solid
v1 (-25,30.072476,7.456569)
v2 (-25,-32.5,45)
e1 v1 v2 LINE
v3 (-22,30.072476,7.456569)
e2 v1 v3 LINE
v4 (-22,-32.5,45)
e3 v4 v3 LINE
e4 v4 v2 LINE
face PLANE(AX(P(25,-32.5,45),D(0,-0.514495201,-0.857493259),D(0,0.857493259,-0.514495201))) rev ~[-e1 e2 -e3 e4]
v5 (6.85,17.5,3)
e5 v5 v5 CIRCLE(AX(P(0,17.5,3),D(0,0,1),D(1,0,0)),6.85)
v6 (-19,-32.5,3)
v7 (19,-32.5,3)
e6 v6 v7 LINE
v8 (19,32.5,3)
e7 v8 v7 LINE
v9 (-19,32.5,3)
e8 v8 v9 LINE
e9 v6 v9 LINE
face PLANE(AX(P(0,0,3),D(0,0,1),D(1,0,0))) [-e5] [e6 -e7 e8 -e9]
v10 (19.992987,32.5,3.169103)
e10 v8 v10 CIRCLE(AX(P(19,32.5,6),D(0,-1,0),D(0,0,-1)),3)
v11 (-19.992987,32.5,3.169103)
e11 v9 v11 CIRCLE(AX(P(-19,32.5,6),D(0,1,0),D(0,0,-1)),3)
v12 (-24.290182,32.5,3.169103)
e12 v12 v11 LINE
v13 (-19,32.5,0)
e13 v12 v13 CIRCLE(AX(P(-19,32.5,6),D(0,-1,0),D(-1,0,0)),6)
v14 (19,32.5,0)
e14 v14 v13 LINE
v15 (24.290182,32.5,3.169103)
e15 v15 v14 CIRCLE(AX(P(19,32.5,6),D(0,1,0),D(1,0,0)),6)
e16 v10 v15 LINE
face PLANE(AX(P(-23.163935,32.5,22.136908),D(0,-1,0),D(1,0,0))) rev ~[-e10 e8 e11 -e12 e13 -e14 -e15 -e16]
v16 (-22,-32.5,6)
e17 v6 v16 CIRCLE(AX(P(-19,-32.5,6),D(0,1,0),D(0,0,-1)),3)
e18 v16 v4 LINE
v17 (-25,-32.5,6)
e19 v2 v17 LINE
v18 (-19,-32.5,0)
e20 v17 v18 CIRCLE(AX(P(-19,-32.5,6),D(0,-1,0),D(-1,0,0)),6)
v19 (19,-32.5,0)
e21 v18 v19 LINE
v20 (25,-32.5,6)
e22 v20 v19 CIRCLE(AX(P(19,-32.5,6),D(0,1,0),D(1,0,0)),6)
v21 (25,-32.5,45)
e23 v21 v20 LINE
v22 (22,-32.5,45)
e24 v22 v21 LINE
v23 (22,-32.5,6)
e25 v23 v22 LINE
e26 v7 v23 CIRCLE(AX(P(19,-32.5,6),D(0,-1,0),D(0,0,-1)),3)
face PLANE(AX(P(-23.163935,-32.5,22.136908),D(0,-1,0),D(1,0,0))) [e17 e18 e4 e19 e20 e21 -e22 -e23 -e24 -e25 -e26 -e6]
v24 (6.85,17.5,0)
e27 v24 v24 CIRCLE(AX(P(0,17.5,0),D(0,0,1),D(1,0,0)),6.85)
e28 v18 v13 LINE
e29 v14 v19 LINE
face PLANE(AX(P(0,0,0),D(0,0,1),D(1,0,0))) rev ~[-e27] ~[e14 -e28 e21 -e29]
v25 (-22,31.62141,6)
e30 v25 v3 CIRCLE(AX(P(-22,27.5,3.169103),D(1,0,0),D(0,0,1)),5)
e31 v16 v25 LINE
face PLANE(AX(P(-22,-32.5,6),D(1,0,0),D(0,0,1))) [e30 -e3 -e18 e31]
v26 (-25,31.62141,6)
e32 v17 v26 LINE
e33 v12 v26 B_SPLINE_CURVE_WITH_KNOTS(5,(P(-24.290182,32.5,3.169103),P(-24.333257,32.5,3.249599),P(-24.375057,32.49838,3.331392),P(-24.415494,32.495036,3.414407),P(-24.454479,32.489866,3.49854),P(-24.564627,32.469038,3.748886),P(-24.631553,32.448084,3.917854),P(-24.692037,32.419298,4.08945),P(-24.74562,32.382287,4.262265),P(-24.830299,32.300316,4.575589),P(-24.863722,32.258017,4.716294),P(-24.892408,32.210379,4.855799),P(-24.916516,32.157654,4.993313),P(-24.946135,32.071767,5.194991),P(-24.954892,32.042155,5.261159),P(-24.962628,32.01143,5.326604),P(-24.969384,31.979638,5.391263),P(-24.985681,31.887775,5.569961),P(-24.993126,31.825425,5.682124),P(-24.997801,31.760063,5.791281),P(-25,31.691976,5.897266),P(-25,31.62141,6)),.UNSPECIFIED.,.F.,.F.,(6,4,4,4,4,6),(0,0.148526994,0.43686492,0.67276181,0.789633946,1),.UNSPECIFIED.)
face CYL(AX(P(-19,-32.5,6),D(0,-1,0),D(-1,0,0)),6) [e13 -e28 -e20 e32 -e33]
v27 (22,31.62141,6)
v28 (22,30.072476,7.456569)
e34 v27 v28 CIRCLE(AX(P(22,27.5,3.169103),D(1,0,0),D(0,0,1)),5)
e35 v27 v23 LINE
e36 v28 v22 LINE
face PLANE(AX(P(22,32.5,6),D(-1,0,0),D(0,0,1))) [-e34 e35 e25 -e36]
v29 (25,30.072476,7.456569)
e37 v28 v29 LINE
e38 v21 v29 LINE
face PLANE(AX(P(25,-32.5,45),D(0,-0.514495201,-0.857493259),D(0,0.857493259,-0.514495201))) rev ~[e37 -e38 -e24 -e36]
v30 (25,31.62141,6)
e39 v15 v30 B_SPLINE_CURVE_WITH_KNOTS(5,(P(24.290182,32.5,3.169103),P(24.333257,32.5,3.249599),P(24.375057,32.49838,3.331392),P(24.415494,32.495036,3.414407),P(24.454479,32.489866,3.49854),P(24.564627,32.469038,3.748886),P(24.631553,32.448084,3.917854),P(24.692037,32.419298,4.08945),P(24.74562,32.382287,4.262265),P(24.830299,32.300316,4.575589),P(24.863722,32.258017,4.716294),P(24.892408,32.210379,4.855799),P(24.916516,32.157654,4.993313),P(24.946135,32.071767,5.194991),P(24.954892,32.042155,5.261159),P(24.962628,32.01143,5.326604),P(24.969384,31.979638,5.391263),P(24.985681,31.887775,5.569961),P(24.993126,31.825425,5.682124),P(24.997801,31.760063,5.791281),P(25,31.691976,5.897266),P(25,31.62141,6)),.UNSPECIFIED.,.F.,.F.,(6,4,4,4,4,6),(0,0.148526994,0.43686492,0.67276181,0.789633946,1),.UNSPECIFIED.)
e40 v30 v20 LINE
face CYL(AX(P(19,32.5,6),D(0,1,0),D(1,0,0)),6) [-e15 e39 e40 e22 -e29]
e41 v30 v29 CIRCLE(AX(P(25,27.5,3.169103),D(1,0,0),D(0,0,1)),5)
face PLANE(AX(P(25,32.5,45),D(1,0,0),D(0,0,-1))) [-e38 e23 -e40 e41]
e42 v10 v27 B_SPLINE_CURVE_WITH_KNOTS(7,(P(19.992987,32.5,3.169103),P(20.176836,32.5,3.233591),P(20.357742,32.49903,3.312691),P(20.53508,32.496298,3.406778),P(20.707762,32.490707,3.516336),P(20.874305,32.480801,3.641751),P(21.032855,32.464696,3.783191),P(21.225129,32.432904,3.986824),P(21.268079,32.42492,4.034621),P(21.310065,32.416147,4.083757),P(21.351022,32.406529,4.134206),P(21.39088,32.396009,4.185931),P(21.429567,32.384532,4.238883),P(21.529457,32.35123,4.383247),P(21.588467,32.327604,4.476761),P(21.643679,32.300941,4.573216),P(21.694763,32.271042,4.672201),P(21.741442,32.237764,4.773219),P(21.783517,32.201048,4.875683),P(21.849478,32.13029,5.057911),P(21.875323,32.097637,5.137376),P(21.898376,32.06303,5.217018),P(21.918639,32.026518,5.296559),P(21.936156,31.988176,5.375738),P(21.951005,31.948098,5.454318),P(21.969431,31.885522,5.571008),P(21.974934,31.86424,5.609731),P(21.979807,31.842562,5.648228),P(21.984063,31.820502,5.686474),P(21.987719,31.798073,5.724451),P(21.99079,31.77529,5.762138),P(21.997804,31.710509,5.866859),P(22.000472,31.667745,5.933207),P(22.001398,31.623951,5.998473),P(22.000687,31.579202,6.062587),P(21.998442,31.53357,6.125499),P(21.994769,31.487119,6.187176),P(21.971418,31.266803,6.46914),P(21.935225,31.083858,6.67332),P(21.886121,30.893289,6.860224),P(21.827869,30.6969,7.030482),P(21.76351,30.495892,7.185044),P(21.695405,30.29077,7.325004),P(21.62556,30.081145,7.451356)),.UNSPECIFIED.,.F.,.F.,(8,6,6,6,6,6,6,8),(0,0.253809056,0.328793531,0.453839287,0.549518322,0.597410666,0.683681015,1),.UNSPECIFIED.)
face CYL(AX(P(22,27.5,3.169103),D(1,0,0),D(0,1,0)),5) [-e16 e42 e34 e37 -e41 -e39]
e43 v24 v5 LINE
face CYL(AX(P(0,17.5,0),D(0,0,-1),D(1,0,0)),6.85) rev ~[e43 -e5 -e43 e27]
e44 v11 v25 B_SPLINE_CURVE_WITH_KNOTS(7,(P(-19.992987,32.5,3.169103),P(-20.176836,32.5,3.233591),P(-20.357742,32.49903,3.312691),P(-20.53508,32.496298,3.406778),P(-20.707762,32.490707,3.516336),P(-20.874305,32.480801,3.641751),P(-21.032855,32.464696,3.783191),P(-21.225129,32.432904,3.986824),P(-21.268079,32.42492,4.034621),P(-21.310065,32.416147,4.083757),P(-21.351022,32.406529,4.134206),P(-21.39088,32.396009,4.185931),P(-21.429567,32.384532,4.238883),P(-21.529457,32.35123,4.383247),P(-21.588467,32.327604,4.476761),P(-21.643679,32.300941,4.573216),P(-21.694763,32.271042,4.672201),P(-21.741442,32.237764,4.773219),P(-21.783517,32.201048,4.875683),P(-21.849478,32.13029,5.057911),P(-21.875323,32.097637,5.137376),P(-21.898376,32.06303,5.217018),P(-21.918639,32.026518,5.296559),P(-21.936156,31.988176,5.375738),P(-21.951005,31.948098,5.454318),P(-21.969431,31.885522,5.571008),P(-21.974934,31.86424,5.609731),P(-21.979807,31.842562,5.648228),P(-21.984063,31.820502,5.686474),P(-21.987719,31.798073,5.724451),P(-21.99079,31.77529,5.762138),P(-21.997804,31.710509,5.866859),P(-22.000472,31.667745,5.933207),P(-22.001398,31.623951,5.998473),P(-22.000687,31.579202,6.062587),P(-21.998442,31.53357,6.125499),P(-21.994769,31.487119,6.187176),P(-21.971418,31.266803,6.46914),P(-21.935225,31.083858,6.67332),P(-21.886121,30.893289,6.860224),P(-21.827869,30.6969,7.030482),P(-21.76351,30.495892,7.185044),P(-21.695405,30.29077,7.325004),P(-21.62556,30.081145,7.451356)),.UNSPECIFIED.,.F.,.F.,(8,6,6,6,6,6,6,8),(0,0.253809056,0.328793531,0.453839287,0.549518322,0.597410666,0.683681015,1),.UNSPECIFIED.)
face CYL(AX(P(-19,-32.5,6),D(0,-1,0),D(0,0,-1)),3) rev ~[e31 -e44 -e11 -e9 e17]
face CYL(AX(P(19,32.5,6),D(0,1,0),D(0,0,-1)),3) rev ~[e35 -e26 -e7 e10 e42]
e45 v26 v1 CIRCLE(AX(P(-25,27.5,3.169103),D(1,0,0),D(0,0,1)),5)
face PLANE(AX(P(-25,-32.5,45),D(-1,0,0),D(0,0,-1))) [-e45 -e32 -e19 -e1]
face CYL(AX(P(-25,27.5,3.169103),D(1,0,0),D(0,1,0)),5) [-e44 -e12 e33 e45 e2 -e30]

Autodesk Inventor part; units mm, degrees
ref_plane "YZ Plane" through (0, 0, 0) normal (1, 0, 0) x (0, 1, 0)
ref_plane "XZ Plane" through (0, 0, 0) normal (0, 1, 0) x (-1, 0, 0)
ref_plane "XY Plane" through (0, 0, 0) normal (0, 0, 1) x (1, 0, 0)
sketch "Sketch1" plane through (0, 0, 0) normal (0, 0, 1) x (1, 0, 0)
  line L0 (-25, -32.5) -> (25, -32.5)
  line L1 (25, -32.5) -> (25, 32.5)
  line L2 (25, 32.5) -> (-25, 32.5)
  line L3 (-25, 32.5) -> (-25, -32.5)
  line L4 (-25, -32.5) -> (25, 32.5) construction
  line L5 (25, -32.5) -> (-25, 32.5) construction
  circle A0 centre (0, 17.5) radius 6.85
  point P0 (0, 0)
  dimension "d0" = 50
  dimension "d1" = 13.7
  dimension "d2" = 50
  dimension "d3" = 65
extrude "Plate1" add sketch "Sketch1" along normal blind 3
sketch "Sketch2" plane through (-22, -32.5, 0) normal (-1, 0, 0) x (0, -1, 0)
  line L0 (-65, 0) -> (0, 0)
  line L1 (0, 0) -> (0, 45)
  line L2 (0, 45) -> (-65, 45)
  line L3 (-65, 45) -> (-65, 0)
edge flange "Flange1" height 45 angle 90 thickness 3 bend radius 3 thickness toward (-1, 0, 0) relief tear relief width 3 relief depth 1.5 corner gap 3 corner form 0 edges at (-25, 0, 3) (25, 0, 3) wall of the first edge with corners at (-22, 32.5, 0) (-22, -32.5, 0) (-22, -32.5, 45) (-22, 32.5, 45)
bend "Bend1"
corner "Corner1"
sketch "Sketch3" plane through (25, -32.5, 45) normal (1, 0, 0) x (0, 0, -1)
  line L0 (0, 65) -> (0, 0) projected
  line L1 (0, 0) -> (40.9053, 68.1756)
  line L2 (40.9053, 68.1756) -> (0, 68.1756)
  line L3 (0, 68.1756) -> (0, 0)
  point P0 (45, 32.5)
  point P1 (0, 65)
  point P2 (39, 65)
extrude "Extrusion1" cut sketch "Sketch3" against normal through all
fillet "Fillet1" radius 5 2 edges at (-23.5, 32.5, 6) (23.5, 32.5, 6)
equation "\"d4\" = Thickness"
equation "\"d5\" = BendReliefWidth"
equation "\"d6\" = BendReliefDepth"
equation "\"d7\" = MinimumRemnant"
equation "\"d8\" = TransitionRadius"
equation "\"d11\" = BendRadius"
equation "\"d12\" = CornerReliefSize"
equation "\"d13\" = GapSize"
equation "\"d14\" = JacobiRadiusSize"
equation "\"BendRadius\" = Thickness"
equation "\"BendReliefWidth\" = Thickness"
equation "\"BendReliefDepth\" = 0.5 * Thickness"
equation "\"CornerReliefSize\" = 4 * Thickness"
equation "\"MinimumRemnant\" = 2 * Thickness"
equation "\"TransitionRadius\" = BendRadius"
equation "\"JacobiRadiusSize\" = BendRadius"
equation "\"GapSize\" = Thickness"
equation "\"Thickness\" = 3"
properties part number "Soporte Fijo"
